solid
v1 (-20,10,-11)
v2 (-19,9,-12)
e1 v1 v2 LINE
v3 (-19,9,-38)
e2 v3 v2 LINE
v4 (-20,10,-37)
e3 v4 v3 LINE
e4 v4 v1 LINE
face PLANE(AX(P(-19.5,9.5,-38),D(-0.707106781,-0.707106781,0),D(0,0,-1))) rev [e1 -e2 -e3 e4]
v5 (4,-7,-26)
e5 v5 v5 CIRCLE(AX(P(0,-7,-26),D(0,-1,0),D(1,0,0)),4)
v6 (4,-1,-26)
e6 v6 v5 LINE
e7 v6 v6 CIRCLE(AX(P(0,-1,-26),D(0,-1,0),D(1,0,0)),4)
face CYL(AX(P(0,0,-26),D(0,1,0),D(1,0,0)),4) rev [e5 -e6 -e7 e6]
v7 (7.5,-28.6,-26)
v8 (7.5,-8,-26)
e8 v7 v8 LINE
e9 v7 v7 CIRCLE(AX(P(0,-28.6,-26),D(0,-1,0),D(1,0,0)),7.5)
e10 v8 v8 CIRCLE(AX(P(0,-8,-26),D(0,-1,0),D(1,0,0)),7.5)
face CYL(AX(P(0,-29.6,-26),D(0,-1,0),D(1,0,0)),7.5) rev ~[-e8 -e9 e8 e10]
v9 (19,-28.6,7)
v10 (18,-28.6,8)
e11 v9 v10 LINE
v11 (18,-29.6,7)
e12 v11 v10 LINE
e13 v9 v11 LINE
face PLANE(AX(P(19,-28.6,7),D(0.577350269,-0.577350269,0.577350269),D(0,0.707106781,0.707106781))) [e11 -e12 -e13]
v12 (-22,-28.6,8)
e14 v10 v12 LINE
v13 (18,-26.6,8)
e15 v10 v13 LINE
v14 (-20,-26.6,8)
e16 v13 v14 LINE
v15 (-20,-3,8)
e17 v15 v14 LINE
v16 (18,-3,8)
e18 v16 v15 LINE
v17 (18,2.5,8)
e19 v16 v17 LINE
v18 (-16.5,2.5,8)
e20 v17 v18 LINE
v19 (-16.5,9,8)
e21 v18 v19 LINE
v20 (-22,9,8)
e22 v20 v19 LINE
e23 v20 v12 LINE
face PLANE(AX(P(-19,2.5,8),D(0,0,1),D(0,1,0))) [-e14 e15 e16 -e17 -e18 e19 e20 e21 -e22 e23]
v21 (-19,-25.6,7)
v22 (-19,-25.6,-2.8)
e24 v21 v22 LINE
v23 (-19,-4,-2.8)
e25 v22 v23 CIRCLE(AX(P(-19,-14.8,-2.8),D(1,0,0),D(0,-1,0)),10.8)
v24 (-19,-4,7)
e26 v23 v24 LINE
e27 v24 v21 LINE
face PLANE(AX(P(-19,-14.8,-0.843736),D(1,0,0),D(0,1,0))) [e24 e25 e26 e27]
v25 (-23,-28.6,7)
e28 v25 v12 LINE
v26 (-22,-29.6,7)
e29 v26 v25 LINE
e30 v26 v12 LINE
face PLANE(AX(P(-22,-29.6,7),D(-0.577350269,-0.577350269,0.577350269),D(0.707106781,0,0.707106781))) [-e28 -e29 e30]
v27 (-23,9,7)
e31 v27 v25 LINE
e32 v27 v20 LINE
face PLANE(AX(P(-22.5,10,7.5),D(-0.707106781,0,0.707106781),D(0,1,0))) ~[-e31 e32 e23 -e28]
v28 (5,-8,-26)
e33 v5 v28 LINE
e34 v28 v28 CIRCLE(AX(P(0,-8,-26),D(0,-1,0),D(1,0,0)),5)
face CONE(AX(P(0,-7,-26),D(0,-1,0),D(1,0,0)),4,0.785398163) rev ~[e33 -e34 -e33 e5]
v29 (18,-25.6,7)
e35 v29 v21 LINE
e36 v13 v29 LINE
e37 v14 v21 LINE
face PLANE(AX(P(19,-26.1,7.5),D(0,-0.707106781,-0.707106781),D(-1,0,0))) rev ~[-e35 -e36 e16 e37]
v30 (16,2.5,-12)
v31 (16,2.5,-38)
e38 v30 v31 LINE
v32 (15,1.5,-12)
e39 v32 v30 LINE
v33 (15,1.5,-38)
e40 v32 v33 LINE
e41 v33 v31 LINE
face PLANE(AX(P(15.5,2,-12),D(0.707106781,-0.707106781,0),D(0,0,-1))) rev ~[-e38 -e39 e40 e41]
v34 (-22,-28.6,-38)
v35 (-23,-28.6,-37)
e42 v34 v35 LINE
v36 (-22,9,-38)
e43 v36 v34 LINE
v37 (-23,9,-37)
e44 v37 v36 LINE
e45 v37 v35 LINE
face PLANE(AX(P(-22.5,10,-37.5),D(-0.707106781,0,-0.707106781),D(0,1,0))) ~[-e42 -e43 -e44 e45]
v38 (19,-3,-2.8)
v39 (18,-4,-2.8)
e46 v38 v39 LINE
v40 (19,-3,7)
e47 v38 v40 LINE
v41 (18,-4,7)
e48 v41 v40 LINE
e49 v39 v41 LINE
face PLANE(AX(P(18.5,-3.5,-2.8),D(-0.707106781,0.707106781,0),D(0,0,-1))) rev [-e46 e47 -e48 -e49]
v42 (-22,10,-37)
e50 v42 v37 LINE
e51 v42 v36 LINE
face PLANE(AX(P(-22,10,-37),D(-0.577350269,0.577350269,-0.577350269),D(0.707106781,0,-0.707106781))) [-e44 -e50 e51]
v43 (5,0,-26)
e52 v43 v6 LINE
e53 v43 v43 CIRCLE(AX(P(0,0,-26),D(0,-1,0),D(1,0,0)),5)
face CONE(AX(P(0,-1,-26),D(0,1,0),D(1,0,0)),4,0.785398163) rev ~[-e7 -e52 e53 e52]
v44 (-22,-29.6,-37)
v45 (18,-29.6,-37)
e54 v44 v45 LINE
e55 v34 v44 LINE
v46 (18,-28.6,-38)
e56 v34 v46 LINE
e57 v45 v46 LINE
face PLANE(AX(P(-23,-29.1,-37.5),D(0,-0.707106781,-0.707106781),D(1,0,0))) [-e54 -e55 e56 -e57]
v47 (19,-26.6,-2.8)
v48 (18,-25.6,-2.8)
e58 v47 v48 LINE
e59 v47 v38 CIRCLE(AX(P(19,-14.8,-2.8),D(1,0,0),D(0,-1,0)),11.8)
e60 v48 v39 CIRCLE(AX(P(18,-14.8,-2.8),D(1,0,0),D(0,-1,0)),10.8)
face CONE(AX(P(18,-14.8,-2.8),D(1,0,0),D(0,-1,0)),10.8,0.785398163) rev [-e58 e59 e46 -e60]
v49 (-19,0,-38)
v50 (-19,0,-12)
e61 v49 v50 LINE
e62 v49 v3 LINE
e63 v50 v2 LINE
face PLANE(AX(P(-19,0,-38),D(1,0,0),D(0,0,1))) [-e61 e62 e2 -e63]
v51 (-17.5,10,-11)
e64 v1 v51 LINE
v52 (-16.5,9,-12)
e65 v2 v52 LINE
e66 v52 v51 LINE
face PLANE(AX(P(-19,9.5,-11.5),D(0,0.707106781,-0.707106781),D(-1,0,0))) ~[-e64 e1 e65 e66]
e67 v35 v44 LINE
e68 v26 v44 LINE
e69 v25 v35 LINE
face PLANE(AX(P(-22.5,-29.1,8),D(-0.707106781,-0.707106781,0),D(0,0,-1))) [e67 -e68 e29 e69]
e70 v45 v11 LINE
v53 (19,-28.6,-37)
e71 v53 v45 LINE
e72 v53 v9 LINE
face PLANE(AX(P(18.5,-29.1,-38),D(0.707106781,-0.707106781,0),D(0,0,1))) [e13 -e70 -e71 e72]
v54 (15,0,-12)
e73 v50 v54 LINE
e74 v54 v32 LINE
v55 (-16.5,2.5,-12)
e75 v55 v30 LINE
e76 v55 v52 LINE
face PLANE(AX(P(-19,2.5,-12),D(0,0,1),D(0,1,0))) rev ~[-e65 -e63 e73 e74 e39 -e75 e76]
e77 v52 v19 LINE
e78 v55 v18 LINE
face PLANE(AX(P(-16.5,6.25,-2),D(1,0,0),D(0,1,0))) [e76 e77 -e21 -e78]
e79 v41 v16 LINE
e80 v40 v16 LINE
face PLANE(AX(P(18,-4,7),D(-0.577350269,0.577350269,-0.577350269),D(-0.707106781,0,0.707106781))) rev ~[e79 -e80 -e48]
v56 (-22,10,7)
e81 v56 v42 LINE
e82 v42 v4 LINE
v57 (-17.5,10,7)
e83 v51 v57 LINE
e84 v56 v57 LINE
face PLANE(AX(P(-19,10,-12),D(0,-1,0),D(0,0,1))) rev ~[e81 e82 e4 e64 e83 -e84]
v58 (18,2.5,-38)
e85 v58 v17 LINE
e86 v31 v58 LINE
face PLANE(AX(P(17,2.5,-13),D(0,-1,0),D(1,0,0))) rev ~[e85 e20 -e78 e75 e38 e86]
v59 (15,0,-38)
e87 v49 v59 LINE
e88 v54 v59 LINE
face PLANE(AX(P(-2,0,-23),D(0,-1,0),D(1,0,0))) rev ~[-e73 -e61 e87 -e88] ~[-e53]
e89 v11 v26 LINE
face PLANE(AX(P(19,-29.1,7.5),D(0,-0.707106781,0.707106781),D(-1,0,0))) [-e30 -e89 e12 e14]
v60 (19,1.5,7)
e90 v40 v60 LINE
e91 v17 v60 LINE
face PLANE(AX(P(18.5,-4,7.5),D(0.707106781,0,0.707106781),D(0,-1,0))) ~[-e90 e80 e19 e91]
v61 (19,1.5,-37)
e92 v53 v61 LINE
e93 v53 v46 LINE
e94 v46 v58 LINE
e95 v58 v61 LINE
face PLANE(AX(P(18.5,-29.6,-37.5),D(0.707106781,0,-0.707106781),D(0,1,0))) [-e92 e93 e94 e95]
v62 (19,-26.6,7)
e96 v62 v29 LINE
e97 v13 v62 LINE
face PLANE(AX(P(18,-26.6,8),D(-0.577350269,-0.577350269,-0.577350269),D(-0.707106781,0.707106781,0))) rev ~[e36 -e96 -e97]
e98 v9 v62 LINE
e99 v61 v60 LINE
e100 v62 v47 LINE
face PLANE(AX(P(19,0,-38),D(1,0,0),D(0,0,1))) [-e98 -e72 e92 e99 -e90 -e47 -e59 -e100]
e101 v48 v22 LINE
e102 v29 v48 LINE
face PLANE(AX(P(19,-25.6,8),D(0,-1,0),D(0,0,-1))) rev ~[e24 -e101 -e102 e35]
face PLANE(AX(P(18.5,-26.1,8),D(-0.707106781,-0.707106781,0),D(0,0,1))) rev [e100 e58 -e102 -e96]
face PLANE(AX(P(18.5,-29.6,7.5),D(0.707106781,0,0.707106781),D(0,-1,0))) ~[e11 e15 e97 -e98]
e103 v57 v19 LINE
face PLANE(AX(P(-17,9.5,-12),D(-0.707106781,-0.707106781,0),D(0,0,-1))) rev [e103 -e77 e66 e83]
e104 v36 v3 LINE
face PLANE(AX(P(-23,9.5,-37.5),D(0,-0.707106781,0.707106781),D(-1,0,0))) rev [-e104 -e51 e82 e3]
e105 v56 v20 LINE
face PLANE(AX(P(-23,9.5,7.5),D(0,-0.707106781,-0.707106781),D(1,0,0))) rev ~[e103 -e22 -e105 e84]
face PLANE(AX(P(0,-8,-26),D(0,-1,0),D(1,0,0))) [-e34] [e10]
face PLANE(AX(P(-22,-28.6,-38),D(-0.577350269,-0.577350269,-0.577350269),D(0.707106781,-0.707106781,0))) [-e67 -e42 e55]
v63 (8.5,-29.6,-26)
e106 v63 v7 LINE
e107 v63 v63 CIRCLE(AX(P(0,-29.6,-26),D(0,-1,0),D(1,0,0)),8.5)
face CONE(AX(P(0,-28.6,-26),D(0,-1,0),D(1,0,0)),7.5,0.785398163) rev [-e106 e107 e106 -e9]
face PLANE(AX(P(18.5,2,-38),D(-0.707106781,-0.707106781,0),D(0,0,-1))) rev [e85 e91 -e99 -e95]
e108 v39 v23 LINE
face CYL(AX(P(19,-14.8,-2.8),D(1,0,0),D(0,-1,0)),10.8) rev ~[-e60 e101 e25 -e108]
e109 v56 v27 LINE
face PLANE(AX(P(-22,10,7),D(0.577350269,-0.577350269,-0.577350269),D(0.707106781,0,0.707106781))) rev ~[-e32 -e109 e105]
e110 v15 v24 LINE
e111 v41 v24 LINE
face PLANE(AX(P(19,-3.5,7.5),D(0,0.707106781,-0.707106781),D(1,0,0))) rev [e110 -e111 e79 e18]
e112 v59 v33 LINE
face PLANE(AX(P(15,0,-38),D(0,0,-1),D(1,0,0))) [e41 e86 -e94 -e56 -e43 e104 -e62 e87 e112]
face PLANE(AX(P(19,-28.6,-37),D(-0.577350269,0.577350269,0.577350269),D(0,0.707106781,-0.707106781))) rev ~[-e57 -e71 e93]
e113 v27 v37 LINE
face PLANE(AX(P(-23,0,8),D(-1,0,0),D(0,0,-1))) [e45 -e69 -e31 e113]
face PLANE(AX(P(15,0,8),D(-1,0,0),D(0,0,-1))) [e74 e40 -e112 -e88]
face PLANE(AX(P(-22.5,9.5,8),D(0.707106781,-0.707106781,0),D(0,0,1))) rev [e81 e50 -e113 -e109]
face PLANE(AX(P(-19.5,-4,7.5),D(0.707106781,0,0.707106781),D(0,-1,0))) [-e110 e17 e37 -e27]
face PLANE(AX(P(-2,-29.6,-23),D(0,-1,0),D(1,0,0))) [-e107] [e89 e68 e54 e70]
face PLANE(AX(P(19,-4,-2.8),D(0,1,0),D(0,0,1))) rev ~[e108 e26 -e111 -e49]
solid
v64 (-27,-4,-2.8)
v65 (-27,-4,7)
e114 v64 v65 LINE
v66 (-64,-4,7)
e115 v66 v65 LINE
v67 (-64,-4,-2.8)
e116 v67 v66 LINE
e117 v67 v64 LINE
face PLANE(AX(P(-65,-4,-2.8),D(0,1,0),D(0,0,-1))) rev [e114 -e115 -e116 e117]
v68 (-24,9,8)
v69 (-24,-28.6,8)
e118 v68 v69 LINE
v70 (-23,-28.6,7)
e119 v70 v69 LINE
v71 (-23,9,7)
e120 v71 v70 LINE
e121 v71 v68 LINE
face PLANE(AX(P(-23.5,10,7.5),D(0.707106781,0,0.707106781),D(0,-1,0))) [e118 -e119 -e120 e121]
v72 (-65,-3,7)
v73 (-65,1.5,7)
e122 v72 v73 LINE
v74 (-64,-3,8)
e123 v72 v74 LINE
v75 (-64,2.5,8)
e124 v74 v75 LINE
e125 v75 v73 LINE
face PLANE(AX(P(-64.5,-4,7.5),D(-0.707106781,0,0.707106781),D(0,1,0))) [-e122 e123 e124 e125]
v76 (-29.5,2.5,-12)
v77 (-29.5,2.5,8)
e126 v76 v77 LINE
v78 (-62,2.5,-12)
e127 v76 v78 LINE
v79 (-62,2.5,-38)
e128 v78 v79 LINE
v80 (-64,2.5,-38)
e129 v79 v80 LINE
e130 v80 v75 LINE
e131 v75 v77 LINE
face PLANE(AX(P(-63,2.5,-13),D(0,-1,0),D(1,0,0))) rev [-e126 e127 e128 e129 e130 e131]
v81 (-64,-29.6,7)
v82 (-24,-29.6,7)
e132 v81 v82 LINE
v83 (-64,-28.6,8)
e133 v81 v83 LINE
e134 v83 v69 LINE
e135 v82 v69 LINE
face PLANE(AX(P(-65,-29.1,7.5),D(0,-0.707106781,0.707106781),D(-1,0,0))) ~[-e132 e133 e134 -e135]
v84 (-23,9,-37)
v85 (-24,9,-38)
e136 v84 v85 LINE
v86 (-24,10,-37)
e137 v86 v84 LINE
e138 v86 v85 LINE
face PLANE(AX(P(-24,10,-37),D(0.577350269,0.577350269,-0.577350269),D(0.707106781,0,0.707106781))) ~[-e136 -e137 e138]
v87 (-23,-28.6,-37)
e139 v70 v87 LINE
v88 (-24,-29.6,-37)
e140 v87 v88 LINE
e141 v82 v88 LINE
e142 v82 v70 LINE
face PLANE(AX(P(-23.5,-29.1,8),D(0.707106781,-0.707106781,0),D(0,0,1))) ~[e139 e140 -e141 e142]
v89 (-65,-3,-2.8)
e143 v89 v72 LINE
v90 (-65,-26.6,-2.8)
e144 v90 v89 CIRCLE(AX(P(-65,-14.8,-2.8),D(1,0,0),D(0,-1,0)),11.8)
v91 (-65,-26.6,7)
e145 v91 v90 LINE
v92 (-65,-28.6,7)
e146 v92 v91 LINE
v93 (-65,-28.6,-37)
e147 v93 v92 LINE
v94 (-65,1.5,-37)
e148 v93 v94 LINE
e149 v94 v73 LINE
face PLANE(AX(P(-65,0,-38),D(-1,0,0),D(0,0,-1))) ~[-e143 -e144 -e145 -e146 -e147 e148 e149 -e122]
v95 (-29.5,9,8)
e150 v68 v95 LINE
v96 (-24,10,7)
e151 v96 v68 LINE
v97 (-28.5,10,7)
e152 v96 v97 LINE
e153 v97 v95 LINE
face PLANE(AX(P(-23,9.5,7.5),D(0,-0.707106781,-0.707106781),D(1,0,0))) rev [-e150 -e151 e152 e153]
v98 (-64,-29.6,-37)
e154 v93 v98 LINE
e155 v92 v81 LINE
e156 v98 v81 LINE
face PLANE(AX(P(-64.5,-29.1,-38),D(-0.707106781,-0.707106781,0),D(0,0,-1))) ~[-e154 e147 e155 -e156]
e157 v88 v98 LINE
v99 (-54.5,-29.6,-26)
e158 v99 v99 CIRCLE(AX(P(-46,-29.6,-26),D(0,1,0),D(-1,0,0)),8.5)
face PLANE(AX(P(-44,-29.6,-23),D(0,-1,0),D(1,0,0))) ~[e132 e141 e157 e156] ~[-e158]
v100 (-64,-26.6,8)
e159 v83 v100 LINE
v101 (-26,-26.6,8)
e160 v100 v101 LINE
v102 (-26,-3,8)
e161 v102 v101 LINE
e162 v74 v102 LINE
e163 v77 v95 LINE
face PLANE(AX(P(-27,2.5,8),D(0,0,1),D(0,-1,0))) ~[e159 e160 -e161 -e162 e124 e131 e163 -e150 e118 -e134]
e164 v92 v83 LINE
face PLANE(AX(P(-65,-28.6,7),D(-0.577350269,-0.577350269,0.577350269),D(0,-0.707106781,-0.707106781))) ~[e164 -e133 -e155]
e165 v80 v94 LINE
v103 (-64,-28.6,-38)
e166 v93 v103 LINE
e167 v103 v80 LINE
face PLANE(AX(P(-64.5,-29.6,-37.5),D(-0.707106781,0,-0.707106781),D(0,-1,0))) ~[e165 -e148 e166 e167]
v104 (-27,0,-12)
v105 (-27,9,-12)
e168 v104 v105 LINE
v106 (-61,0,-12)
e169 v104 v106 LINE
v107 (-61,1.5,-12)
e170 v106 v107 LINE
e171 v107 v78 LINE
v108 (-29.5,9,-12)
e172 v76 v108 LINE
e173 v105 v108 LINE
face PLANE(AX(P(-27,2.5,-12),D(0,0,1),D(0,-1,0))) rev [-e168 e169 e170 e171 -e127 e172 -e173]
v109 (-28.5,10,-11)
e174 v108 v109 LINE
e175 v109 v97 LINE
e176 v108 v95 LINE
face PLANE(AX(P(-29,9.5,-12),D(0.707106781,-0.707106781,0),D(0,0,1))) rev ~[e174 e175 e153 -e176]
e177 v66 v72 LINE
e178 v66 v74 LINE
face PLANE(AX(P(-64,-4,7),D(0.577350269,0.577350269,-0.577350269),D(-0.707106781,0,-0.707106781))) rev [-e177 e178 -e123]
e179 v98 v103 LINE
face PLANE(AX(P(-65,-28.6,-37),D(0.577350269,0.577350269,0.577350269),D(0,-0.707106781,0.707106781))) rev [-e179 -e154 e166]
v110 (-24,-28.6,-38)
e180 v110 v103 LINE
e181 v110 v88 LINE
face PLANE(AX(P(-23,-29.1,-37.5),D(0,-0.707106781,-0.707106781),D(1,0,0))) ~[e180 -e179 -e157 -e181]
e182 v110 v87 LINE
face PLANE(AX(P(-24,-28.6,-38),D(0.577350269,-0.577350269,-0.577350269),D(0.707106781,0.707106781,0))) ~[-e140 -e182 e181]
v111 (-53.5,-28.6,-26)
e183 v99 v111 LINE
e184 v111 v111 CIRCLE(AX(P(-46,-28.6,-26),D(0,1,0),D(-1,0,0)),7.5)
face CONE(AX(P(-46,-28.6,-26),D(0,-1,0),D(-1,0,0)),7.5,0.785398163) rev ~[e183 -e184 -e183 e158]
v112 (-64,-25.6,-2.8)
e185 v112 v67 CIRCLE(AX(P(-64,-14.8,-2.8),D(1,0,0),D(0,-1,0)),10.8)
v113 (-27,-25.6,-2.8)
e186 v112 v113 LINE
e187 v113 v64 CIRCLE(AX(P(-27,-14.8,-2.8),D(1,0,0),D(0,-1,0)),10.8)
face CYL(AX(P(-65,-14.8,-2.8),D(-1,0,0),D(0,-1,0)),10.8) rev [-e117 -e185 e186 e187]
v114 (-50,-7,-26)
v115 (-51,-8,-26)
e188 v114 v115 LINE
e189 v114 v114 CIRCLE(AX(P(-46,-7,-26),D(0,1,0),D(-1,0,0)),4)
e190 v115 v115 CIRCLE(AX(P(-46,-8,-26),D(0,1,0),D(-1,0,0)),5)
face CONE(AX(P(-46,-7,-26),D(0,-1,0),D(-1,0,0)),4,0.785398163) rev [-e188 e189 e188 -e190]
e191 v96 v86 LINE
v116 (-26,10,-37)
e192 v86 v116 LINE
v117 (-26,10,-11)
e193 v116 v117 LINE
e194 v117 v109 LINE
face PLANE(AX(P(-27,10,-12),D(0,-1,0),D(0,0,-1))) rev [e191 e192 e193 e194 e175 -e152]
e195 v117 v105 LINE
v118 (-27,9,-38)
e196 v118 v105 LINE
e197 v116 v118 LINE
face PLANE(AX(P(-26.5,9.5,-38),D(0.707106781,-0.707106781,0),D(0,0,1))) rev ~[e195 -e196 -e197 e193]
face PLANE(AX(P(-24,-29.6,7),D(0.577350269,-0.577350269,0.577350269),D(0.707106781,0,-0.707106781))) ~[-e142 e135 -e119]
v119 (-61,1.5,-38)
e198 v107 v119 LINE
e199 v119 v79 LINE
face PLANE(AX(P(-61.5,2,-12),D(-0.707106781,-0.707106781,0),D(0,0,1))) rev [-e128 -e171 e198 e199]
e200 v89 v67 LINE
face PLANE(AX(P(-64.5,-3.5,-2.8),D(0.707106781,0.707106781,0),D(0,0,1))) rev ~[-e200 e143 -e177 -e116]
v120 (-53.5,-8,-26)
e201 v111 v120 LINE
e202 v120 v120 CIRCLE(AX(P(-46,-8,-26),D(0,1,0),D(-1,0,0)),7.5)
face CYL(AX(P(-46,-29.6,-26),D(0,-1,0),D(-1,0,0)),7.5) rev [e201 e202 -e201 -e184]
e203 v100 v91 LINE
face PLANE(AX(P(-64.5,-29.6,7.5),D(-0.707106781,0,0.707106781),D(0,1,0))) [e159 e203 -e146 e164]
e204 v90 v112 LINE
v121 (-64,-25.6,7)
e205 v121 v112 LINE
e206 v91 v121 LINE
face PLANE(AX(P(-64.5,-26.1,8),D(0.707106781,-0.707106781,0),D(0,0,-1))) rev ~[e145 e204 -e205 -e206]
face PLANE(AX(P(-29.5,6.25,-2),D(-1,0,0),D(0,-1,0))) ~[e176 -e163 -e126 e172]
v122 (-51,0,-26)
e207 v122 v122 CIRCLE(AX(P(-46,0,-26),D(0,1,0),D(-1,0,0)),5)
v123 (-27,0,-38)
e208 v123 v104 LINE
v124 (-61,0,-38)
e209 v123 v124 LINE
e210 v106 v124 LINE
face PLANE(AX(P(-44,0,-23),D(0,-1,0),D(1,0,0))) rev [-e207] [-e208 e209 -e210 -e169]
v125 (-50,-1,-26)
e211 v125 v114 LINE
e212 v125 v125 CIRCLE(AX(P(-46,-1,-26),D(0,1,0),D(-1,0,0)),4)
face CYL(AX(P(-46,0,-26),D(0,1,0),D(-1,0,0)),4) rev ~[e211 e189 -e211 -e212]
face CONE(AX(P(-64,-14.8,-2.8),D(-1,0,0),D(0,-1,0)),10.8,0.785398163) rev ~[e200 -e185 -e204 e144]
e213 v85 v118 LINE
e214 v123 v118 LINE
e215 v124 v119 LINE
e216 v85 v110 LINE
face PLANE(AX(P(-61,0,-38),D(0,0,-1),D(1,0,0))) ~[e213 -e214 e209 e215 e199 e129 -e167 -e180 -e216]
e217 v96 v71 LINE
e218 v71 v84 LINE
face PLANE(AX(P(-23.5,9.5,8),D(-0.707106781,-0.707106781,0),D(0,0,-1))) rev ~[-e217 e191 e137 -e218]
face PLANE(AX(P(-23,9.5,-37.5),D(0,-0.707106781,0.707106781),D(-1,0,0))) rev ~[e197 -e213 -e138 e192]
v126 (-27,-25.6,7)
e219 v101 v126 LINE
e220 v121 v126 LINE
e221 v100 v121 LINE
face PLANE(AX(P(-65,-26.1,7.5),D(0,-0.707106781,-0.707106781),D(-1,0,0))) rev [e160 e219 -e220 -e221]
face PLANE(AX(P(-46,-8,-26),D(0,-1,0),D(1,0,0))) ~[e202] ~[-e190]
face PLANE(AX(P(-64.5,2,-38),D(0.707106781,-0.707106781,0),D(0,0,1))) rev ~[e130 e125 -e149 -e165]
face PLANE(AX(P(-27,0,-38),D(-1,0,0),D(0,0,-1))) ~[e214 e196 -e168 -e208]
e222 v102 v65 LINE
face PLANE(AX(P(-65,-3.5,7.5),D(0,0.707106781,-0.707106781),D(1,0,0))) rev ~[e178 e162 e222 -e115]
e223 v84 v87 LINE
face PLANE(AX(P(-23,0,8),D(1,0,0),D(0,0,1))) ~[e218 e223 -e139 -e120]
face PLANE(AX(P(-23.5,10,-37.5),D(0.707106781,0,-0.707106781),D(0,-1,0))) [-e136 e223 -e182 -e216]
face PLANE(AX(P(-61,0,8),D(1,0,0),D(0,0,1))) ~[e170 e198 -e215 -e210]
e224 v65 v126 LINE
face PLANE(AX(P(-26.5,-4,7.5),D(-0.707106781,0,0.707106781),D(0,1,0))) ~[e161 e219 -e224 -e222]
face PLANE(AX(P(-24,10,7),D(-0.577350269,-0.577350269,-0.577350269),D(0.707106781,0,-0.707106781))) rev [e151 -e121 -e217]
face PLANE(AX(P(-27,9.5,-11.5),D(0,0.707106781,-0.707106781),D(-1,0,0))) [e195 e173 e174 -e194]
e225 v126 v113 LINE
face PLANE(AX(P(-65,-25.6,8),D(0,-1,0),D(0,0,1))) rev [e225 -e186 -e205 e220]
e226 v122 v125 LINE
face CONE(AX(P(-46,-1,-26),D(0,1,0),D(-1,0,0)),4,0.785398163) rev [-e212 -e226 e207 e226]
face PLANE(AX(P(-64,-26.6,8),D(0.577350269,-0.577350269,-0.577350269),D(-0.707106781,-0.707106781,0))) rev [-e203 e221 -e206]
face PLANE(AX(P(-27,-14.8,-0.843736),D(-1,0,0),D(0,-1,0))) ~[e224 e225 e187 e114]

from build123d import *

# Parameters (mm, degrees)
F6_R      = 7.5
F6_R_2    = 4
F6_W      = 4
F6_H      = 4
F7_DEPTH  = 29.6
F8_DEPTH  = 2.5
F9_DEPTH  = 10
F10_DEPTH = 2.5
F12_DEPTH = 38
F14_W     = 7.5
F14_H     = 20
F15_DEPTH = 2.5
F16_R     = 7.5
F16_R_2   = 4
F17_DEPTH = 21.6
F18_SIZE  = 1


with BuildPart() as f7:
    # F6 (on Front) → F7 (new body)
    with BuildSketch(Plane.XZ):
        Polygon((0, -12), (-19, -12), (-19, -34), (0, -34), (15, -34), (15, -12), align=None)
        with Locations((0, -26)):
            Circle(F6_R, mode=Mode.SUBTRACT)
        Polygon((15, 8), (0, 8), (-19, 8), (-19, -12), (0, -12), (15, -12), align=None)
        Circle(F6_R_2, mode=Mode.SUBTRACT)
        with Locations((0, -26)):
            Circle(F6_R)
        with Locations((0, -26)):
            Circle(F6_R_2, mode=Mode.SUBTRACT)
        Polygon((-19, -12), (-19, 8), (-23, 8), (-23, -34), (-19, -34), align=None)
        Polygon((19, 8), (15, 8), (15, -12), (15, -34), (19, -34), align=None)
        Polygon((0, -34), (-19, -34), (-19, -38), (15, -38), (15, -34), align=None)
        Circle(F6_R_2)
        with Locations((-21, -36)):
            Rectangle(F6_W, F6_H)
        with Locations((17, -36)):
            Rectangle(F6_W, F6_H)
    extrude(amount=F7_DEPTH)

    # F6 (on Front) → F8 (join)
    with BuildSketch(Plane.XZ):
        Polygon((15, 8), (0, 8), (-19, 8), (-19, -12), (0, -12), (15, -12), align=None)
        Circle(F6_R_2, mode=Mode.SUBTRACT)
        Circle(F6_R_2)
    extrude(amount=-F8_DEPTH)

    # F6 (on Front) → F9 (join)
    with BuildSketch(Plane.XZ):
        Polygon((-19, -12), (-19, 8), (-23, 8), (-23, -34), (-19, -34), align=None)
        with Locations((-21, -36)):
            Rectangle(F6_W, F6_H)
    extrude(amount=-F9_DEPTH)

    # F6 (on Front) → F10 (join)
    with BuildSketch(Plane.XZ):
        Polygon((19, 8), (15, 8), (15, -12), (15, -34), (19, -34), align=None)
        with Locations((17, -36)):
            Rectangle(F6_W, F6_H)
    extrude(amount=-F10_DEPTH)

    # F11 (on face) → F12 (cut)
    with BuildSketch(Plane.YZ.offset(19)):
        with BuildLine():
            Line((-25.6, 8), (-25.6, -2.8))
            ThreePointArc((-25.6, -2.8), (-14.8, -13.6), (-4, -2.8))
            Line((-4, -2.8), (-4, 8))
            Line((-4, 8), (-25.6, 8))
        make_face()
    extrude(amount=-F12_DEPTH, mode=Mode.SUBTRACT)

    # F13: union 

    # F14 (on face) → F15 (join)
    with BuildSketch(Plane.YZ.offset(-19)):
        with Locations((6.25, -2)):
            Rectangle(F14_W, F14_H)
    extrude(amount=F15_DEPTH)

    # F16 (on face) → F17 (cut)
    with BuildSketch(Plane.XZ.offset(29.6)):
        with Locations((0, -26)):
            Circle(F16_R)
        with Locations((0, -26)):
            Circle(F16_R_2, mode=Mode.SUBTRACT)
    extrude(amount=-F17_DEPTH, mode=Mode.SUBTRACT)

    # F18
    f18_edges = [f7.edges().sort_by_distance(p)[0] for p in [
        (-4, 0, -26),
        (-23, -9.8, 8),
        (-23, -29.6, -15),
        (-23, -9.8, -38),
        (-23, 10, -15),
        (-2, -29.6, 8),
        (-2, -29.6, -38),
        (19, -29.6, -15),
        (-7.5, -29.6, -26),
        (19, -13.55, -38),
        (19, 2.5, -15),
        (19, -0.75, 8),
        (19, -4, 2.6),
        (19, -14.8, -13.6),
        (19, -25.6, 2.6),
        (19, -27.6, 8),
        (-21, 10, -38),
        (-19, 10, -25),
        (-17.75, 10, -12),
        (-16.5, 10, -2),
        (-19.75, 10, 8),
        (15, 2.5, -25),
        (-4, -8, -26),
        (0, -4, 8),
        (-19, -14.8, 8),
        (0, -25.6, 8),
    ]]
    chamfer(f18_edges, length=F18_SIZE)


with BuildPart() as f19_1:
    # F19: instance of F7
    add(f7.part.mirror(Plane(origin=(-23, -9.8, -15), x_dir=(0, -1, 0), z_dir=(-1, 0, 0))))


solid = Compound([f7.part, f19_1.part])
